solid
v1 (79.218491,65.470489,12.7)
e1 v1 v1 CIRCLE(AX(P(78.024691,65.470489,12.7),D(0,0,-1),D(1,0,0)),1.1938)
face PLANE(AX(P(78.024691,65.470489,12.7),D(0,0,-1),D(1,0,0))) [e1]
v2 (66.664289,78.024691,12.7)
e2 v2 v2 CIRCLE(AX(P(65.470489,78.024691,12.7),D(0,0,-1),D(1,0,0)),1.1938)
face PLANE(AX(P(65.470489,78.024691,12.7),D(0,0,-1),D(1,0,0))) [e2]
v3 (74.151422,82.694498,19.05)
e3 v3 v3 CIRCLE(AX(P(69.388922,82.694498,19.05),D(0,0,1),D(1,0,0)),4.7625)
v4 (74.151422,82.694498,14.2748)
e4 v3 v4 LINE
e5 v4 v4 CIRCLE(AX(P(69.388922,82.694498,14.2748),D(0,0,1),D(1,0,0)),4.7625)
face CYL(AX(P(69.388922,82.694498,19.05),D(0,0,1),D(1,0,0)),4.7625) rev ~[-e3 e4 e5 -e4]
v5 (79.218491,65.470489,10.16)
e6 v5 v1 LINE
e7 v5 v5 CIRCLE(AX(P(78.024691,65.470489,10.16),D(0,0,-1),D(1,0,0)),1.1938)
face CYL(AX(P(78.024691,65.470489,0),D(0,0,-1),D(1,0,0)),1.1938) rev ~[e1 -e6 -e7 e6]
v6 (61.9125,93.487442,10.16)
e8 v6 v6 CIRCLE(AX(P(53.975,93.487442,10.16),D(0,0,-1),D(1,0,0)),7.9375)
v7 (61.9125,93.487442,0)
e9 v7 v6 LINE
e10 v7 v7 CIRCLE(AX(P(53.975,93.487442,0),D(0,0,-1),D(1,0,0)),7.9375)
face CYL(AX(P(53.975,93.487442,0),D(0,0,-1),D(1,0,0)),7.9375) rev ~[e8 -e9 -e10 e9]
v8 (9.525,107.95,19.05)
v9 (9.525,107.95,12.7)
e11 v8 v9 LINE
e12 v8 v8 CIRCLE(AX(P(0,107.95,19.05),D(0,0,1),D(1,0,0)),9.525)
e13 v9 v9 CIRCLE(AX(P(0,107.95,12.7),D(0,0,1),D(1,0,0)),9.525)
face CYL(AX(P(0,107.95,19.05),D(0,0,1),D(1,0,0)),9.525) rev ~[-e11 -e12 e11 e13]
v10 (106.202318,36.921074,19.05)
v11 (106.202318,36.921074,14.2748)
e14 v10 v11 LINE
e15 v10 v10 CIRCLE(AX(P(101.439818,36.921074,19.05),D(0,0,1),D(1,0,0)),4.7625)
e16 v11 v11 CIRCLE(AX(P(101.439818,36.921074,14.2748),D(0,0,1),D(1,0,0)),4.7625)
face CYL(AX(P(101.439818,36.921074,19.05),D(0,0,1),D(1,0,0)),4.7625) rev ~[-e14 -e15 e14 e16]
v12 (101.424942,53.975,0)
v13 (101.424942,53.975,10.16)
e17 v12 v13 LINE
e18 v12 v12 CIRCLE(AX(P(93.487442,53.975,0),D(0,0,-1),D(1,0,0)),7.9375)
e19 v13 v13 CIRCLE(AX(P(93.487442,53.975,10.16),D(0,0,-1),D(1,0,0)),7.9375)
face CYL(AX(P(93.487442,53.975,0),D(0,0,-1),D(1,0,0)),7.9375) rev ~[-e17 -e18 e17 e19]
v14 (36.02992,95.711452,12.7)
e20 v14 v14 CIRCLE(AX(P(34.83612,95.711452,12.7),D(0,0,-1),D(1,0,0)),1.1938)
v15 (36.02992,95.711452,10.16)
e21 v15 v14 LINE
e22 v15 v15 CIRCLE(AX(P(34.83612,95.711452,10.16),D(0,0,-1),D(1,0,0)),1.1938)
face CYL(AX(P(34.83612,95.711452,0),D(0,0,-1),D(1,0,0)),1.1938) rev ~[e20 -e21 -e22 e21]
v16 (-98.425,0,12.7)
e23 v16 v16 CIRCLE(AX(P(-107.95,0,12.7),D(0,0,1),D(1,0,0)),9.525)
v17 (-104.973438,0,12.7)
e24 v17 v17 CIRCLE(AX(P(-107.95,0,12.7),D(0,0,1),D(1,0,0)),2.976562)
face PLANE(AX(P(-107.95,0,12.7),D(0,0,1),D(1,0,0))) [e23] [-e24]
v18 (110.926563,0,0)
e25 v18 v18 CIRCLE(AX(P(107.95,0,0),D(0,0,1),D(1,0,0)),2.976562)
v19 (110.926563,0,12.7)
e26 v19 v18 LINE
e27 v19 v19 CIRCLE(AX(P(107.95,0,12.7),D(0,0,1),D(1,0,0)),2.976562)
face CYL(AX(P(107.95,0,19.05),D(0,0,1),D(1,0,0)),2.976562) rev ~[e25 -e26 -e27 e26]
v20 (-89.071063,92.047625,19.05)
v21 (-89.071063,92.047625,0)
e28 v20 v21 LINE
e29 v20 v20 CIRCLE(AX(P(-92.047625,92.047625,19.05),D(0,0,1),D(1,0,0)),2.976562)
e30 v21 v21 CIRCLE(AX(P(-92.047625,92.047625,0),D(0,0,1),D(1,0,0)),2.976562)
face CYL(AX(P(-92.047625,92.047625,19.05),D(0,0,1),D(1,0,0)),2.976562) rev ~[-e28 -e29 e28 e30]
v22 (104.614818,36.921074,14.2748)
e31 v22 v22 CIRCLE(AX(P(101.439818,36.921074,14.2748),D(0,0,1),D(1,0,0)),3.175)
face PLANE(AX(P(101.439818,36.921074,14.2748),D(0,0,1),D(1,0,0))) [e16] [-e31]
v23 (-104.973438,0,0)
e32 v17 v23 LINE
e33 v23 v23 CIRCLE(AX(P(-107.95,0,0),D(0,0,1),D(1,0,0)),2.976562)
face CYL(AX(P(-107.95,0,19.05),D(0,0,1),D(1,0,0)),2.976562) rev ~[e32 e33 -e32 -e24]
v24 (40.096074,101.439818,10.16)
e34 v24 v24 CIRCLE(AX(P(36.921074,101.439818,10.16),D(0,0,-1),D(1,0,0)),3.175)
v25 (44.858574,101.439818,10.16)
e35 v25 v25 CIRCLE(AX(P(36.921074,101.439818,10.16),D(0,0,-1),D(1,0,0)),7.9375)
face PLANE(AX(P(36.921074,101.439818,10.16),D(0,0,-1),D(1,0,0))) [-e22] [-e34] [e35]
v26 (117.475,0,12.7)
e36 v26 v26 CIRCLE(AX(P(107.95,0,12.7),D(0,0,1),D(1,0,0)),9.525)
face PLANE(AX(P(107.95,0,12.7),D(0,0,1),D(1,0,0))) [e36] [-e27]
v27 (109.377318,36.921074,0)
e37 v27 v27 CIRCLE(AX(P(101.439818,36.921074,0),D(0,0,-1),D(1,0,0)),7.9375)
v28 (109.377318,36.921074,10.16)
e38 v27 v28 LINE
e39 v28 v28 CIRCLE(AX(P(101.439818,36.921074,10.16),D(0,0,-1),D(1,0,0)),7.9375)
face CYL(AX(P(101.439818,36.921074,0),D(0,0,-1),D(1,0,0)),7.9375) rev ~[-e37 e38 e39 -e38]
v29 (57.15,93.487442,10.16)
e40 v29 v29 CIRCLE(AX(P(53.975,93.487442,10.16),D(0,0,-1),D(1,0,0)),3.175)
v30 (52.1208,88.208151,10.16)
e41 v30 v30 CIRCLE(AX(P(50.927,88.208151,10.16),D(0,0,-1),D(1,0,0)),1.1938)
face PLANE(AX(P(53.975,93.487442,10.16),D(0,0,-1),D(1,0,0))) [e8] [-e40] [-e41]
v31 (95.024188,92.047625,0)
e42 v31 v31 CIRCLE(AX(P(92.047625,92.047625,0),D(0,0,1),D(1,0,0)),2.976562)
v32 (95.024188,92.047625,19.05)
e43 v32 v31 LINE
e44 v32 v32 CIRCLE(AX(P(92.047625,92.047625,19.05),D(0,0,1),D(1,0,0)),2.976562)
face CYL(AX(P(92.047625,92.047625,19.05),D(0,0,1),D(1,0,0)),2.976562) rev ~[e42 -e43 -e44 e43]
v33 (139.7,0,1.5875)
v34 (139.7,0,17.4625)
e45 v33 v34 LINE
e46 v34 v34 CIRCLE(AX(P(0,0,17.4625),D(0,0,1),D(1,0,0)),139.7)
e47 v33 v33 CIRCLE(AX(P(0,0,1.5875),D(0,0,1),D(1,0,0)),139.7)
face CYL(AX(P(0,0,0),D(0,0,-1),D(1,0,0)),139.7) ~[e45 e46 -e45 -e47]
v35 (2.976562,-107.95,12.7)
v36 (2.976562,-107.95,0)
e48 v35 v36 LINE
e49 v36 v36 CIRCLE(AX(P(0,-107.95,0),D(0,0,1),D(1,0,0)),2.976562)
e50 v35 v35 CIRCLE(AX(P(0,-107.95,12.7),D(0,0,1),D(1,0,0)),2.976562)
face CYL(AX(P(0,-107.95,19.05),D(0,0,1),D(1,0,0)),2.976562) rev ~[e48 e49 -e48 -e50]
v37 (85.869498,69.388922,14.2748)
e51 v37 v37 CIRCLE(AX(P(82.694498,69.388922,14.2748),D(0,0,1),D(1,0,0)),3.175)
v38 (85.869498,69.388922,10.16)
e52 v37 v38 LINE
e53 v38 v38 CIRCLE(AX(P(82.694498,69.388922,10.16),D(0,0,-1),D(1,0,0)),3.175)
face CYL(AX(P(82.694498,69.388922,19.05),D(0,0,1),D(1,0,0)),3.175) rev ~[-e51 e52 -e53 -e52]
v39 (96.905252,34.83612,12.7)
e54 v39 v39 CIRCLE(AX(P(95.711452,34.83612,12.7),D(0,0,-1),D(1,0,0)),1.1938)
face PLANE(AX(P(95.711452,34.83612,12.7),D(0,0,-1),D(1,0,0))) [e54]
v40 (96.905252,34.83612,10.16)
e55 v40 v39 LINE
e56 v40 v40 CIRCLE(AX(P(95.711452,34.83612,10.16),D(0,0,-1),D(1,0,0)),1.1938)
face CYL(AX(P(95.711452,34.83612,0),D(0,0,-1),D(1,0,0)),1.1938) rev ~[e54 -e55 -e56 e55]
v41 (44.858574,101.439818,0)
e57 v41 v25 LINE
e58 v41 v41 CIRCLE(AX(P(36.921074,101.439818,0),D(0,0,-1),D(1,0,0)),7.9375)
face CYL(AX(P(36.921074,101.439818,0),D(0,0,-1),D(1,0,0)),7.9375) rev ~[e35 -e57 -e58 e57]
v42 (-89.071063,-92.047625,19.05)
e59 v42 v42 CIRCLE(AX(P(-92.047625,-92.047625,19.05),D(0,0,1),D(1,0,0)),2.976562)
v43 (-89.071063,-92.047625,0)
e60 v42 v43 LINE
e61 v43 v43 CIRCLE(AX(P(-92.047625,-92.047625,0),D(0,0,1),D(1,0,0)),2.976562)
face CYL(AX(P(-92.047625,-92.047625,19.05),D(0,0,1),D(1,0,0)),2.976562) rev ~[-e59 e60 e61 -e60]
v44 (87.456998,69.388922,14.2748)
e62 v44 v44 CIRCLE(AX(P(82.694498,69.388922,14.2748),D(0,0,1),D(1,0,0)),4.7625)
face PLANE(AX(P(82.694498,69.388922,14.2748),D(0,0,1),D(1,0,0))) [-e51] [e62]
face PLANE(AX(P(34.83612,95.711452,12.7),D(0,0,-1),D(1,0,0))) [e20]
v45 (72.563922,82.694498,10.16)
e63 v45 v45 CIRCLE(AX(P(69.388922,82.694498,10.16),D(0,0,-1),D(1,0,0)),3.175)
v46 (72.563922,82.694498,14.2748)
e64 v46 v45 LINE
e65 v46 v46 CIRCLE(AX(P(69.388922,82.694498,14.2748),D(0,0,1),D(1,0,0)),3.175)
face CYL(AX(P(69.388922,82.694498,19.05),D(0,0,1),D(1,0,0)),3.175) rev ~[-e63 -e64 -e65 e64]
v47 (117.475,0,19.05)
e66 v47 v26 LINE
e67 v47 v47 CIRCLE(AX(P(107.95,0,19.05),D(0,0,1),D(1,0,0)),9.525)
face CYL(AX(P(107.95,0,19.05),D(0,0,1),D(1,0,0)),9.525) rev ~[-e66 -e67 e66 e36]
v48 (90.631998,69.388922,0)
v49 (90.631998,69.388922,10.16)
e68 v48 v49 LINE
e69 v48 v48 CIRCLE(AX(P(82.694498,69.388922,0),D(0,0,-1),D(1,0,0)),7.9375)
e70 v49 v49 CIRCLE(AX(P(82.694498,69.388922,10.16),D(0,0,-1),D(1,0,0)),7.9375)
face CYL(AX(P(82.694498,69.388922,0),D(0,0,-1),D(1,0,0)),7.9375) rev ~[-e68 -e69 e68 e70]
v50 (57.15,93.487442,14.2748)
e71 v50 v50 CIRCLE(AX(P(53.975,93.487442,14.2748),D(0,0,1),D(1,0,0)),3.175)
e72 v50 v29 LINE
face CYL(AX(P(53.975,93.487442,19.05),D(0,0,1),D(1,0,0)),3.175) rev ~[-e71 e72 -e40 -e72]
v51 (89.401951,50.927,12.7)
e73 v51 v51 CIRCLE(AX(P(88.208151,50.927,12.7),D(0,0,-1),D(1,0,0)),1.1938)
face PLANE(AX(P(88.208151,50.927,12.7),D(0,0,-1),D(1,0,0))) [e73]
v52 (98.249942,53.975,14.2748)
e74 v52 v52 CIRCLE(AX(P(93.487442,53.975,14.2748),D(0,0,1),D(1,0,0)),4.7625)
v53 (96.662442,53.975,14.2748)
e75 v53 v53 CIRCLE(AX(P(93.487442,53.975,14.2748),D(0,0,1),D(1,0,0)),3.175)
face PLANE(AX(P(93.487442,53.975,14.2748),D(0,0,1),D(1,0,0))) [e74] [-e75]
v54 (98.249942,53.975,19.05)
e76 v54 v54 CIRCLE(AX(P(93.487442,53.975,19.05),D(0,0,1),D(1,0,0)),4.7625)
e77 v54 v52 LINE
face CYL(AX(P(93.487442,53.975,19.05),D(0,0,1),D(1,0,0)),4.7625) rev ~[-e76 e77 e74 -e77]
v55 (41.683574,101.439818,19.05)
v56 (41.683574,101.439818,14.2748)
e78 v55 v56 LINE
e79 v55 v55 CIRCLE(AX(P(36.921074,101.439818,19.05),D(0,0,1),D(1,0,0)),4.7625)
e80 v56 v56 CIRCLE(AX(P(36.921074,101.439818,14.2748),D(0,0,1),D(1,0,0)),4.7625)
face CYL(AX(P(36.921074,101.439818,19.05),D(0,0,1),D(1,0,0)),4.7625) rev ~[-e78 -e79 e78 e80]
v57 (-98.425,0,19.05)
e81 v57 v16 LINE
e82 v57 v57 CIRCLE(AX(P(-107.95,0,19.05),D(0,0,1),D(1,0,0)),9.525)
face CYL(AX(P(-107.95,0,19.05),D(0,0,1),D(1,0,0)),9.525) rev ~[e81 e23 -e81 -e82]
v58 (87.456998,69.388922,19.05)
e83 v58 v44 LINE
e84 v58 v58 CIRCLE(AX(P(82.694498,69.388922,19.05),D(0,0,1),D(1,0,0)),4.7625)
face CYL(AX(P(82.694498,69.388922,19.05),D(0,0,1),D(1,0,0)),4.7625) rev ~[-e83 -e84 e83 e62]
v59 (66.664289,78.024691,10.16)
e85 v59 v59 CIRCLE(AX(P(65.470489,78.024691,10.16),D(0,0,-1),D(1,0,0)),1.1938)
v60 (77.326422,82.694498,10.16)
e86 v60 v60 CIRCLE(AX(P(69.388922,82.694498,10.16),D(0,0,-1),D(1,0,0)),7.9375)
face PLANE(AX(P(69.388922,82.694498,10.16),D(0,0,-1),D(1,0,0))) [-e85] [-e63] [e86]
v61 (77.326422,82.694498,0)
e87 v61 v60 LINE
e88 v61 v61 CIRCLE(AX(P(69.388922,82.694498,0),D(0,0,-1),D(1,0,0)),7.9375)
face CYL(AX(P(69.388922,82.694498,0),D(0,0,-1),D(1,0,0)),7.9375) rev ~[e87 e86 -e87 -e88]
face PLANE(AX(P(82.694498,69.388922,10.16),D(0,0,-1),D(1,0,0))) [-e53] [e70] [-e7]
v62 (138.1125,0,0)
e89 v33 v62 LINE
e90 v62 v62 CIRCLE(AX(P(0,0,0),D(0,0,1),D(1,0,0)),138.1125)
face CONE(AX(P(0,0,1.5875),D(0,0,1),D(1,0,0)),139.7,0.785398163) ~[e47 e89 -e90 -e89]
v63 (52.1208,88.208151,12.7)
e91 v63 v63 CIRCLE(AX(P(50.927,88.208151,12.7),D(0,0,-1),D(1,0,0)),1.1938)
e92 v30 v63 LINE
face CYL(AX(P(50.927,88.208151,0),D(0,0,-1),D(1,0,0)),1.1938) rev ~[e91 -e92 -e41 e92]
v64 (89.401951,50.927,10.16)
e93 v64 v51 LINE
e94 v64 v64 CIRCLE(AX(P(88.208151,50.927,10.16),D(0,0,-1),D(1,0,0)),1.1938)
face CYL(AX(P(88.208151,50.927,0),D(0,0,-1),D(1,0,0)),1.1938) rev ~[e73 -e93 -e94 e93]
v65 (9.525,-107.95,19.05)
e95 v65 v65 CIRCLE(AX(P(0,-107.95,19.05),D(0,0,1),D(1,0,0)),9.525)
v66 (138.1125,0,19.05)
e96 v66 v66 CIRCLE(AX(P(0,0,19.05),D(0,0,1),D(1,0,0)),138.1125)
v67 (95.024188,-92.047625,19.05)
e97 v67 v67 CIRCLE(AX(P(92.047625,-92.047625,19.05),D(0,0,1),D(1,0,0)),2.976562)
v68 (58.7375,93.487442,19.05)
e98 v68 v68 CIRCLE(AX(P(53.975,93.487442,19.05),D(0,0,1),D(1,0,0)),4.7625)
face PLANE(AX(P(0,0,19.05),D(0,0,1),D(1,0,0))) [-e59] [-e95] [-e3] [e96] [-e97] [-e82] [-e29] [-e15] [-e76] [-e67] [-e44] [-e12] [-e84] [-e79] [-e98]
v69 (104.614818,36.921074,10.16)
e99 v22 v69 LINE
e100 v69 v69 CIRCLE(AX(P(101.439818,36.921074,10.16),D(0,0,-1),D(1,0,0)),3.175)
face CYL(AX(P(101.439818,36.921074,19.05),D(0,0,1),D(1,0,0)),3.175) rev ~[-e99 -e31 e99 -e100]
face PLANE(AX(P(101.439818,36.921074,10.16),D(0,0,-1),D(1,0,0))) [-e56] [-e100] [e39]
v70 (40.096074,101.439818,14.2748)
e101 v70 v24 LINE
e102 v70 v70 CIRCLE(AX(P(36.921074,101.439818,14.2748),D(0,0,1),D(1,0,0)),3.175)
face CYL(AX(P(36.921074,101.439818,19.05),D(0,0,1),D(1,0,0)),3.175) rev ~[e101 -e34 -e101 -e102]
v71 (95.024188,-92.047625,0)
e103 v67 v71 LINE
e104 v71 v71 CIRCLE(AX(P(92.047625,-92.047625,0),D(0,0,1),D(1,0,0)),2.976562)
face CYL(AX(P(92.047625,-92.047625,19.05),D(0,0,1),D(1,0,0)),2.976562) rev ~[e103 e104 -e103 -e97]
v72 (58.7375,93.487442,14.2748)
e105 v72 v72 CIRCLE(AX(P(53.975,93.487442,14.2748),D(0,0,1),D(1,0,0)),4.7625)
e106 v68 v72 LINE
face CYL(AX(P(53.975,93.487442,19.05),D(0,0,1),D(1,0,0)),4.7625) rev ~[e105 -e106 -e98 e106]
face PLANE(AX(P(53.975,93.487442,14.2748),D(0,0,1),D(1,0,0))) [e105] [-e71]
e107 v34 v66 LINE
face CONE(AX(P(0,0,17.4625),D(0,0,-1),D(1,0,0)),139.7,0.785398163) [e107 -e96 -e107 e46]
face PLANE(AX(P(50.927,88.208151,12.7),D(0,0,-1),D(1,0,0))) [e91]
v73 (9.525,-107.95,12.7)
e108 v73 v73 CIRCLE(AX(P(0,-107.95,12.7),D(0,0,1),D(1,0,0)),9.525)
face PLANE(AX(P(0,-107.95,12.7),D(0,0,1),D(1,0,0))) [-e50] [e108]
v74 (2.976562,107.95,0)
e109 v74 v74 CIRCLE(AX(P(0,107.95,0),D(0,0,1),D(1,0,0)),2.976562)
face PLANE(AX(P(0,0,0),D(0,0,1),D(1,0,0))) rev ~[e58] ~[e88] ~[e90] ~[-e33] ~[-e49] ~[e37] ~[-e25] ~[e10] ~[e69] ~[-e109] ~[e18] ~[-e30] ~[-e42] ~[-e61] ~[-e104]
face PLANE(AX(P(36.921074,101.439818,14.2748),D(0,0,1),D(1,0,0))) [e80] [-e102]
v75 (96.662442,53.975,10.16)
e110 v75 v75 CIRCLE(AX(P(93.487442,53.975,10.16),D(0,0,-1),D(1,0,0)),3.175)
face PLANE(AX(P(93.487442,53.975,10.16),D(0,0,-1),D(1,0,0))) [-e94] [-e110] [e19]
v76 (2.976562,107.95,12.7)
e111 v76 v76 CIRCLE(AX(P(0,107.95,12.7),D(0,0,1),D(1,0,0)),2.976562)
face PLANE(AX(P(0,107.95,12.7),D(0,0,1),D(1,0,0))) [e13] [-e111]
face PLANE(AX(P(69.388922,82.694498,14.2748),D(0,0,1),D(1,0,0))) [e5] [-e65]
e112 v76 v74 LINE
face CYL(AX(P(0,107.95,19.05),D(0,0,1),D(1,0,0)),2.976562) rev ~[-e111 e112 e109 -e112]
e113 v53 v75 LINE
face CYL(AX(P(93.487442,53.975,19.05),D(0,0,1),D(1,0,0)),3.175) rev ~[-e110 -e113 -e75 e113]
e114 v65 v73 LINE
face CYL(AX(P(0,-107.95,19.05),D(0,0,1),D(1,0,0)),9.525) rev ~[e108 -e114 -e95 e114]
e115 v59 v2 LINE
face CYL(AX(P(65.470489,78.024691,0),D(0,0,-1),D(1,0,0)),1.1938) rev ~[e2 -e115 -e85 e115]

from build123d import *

# Parameters (mm, degrees)
F2_R      = 139.7
F3_DEPTH  = 19.05
F4_SIZE   = 1.5875
F5_R      = 0.79375
F6_DEPTH  = 19.051
F7_R      = 2.9765625
F7_R_2    = 0.79375
F8_DEPTH  = 19.051
F9_R      = 2.9765625
F10_DEPTH = 19.051
F11_R     = 9.525
F11_R_2   = 2.9765625
F12_DEPTH = 6.35
F13_R     = 3.175
F14_DEPTH = 19.051
F15_R     = 1.1938
F16_DEPTH = 12.7
F17_R     = 7.9375
F17_R_2   = 3.175
F17_R_3   = 1.1938
F18_DEPTH = 10.16
F19_R     = 4.7625
F19_R_2   = 3.175
F20_DEPTH = 4.7752


# Not quite as in the source:
# - a variable given as a bare number and used for a length is read in inches; the dataset says mm whatever the document's units were


with BuildPart() as f3:
    # F2 (on Top) → F3 (new body)
    with BuildSketch(Plane.XY):
        Circle(F2_R)
    extrude(amount=F3_DEPTH)

    # F4
    f4_edges = [f3.edges().sort_by_distance(p)[0] for p in [
        (-139.7, 0, 19.05),
        (-139.7, 0, 0),
    ]]
    chamfer(f4_edges, length=F4_SIZE)

    # F5 (on face) → F6 (cut, through all)
    with BuildSketch(Plane.XY.offset(19.05)):
        with Locations((-92.047625241, 92.047625241)):
            Circle(F5_R)
        with Locations((92.047625241, 92.047625241)):
            Circle(F5_R)
        with Locations((92.047625241, -92.047625241)):
            Circle(F5_R)
        with Locations((-92.047625241, -92.047625241)):
            Circle(F5_R)
    extrude(amount=-F6_DEPTH, mode=Mode.SUBTRACT)

    # F7 (on face) → F8 (cut, through all)
    with BuildSketch(Plane.XY.offset(19.05)):
        with Locations((-92.047625241, 92.047625241)):
            Circle(F7_R)
        with Locations((-92.047625241, 92.047625241)):
            Circle(F7_R_2, mode=Mode.SUBTRACT)
        with Locations((92.047625241, 92.047625241)):
            Circle(F7_R)
        with Locations((92.047625241, 92.047625241)):
            Circle(F7_R_2, mode=Mode.SUBTRACT)
        with Locations((-92.047625241, -92.047625241)):
            Circle(F7_R)
        with Locations((-92.047625241, -92.047625241)):
            Circle(F7_R_2, mode=Mode.SUBTRACT)
        with Locations((92.047625241, -92.047625241)):
            Circle(F7_R)
        with Locations((92.047625241, -92.047625241)):
            Circle(F7_R_2, mode=Mode.SUBTRACT)
    extrude(amount=-F8_DEPTH, mode=Mode.SUBTRACT)

    # F9 (on face) → F10 (cut, through all)
    with BuildSketch(Plane.XY.offset(19.05)):
        with Locations((0, 107.95)):
            Circle(F9_R)
        with Locations((107.95, 0)):
            Circle(F9_R)
        with Locations((0, -107.95)):
            Circle(F9_R)
        with Locations((-107.95, 0)):
            Circle(F9_R)
    extrude(amount=-F10_DEPTH, mode=Mode.SUBTRACT)

    # F11 (on face) → F12 (cut)
    with BuildSketch(Plane.XY.offset(19.05)):
        with Locations((0, 107.95)):
            Circle(F11_R)
        with Locations((0, 107.95)):
            Circle(F11_R_2, mode=Mode.SUBTRACT)
        with Locations((107.95, 0)):
            Circle(F11_R)
        with Locations((107.95, 0)):
            Circle(F11_R_2, mode=Mode.SUBTRACT)
        with Locations((0, -107.95)):
            Circle(F11_R)
        with Locations((0, -107.95)):
            Circle(F11_R_2, mode=Mode.SUBTRACT)
        with Locations((-107.95, 0)):
            Circle(F11_R)
        with Locations((-107.95, 0)):
            Circle(F11_R_2, mode=Mode.SUBTRACT)
    extrude(amount=-F12_DEPTH, mode=Mode.SUBTRACT)

    # F13 (on face) → F14 (cut, through all)
    with BuildSketch(Plane.XY.offset(19.05)):
        with Locations((36.921074472, 101.4398184138)):
            Circle(F13_R)
        with Locations((53.975, 93.4874423385)):
            Circle(F13_R)
        with Locations((69.3889224657, 82.6944976347)):
            Circle(F13_R)
        with Locations((82.6944976347, 69.3889224657)):
            Circle(F13_R)
        with Locations((93.4874423385, 53.975)):
            Circle(F13_R)
        with Locations((101.4398184138, 36.921074472)):
            Circle(F13_R)
    extrude(amount=-F14_DEPTH, mode=Mode.SUBTRACT)

    # F15 (on face) → F16 (cut)
    with BuildSketch(Plane(origin=(0, 0, 0), x_dir=(1, 0, 0), z_dir=(0, 0, -1))):
        with Locations((50.927, -88.2081514771)):
            Circle(F15_R)
        with Locations((65.470489197, -78.0246907094)):
            Circle(F15_R)
        with Locations((78.0246907094, -65.470489197)):
            Circle(F15_R)
        with Locations((88.2081514771, -50.927)):
            Circle(F15_R)
        with Locations((95.7114521975, -34.8361196783)):
            Circle(F15_R)
        with Locations((34.8361196783, -95.7114521975)):
            Circle(F15_R)
    extrude(amount=-F16_DEPTH, mode=Mode.SUBTRACT)

    # F17 (on face) → F18 (cut)
    with BuildSketch(Plane(origin=(0, 0, 0), x_dir=(1, 0, 0), z_dir=(0, 0, -1))):
        with Locations((36.921074472, -101.4398184138)):
            Circle(F17_R)
        with Locations((36.921074472, -101.4398184138)):
            Circle(F17_R_2, mode=Mode.SUBTRACT)
        with Locations((34.8361196783, -95.7114521975)):
            Circle(F17_R_3, mode=Mode.SUBTRACT)
        with Locations((53.975, -93.4874423385)):
            Circle(F17_R)
        with Locations((50.927, -88.2081514771)):
            Circle(F17_R_3, mode=Mode.SUBTRACT)
        with Locations((53.975, -93.4874423385)):
            Circle(F17_R_2, mode=Mode.SUBTRACT)
        with Locations((69.3889224657, -82.6944976347)):
            Circle(F17_R)
        with Locations((65.470489197, -78.0246907094)):
            Circle(F17_R_3, mode=Mode.SUBTRACT)
        with Locations((69.3889224657, -82.6944976347)):
            Circle(F17_R_2, mode=Mode.SUBTRACT)
        with Locations((82.6944976347, -69.3889224657)):
            Circle(F17_R)
        with Locations((82.6944976347, -69.3889224657)):
            Circle(F17_R_2, mode=Mode.SUBTRACT)
        with Locations((78.0246907094, -65.470489197)):
            Circle(F17_R_3, mode=Mode.SUBTRACT)
        with Locations((93.4874423385, -53.975)):
            Circle(F17_R)
        with Locations((93.4874423385, -53.975)):
            Circle(F17_R_2, mode=Mode.SUBTRACT)
        with Locations((88.2081514771, -50.927)):
            Circle(F17_R_3, mode=Mode.SUBTRACT)
        with Locations((101.4398184138, -36.921074472)):
            Circle(F17_R)
        with Locations((95.7114521975, -34.8361196783)):
            Circle(F17_R_3, mode=Mode.SUBTRACT)
        with Locations((101.4398184138, -36.921074472)):
            Circle(F17_R_2, mode=Mode.SUBTRACT)
    extrude(amount=-F18_DEPTH, mode=Mode.SUBTRACT)

    # F19 (on face) → F20 (cut)
    with BuildSketch(Plane.XY.offset(19.05)):
        with Locations((36.921074472, 101.4398184138)):
            Circle(F19_R)
        with Locations((36.921074472, 101.4398184138)):
            Circle(F19_R_2, mode=Mode.SUBTRACT)
        with Locations((53.975, 93.4874423385)):
            Circle(F19_R)
        with Locations((53.975, 93.4874423385)):
            Circle(F19_R_2, mode=Mode.SUBTRACT)
        with Locations((69.3889224657, 82.6944976347)):
            Circle(F19_R)
        with Locations((69.3889224657, 82.6944976347)):
            Circle(F19_R_2, mode=Mode.SUBTRACT)
        with Locations((82.6944976347, 69.3889224657)):
            Circle(F19_R)
        with Locations((82.6944976347, 69.3889224657)):
            Circle(F19_R_2, mode=Mode.SUBTRACT)
        with Locations((93.4874423385, 53.975)):
            Circle(F19_R)
        with Locations((93.4874423385, 53.975)):
            Circle(F19_R_2, mode=Mode.SUBTRACT)
        with Locations((101.4398184138, 36.921074472)):
            Circle(F19_R)
        with Locations((101.4398184138, 36.921074472)):
            Circle(F19_R_2, mode=Mode.SUBTRACT)
    extrude(amount=-F20_DEPTH, mode=Mode.SUBTRACT)


solid = f3.part
